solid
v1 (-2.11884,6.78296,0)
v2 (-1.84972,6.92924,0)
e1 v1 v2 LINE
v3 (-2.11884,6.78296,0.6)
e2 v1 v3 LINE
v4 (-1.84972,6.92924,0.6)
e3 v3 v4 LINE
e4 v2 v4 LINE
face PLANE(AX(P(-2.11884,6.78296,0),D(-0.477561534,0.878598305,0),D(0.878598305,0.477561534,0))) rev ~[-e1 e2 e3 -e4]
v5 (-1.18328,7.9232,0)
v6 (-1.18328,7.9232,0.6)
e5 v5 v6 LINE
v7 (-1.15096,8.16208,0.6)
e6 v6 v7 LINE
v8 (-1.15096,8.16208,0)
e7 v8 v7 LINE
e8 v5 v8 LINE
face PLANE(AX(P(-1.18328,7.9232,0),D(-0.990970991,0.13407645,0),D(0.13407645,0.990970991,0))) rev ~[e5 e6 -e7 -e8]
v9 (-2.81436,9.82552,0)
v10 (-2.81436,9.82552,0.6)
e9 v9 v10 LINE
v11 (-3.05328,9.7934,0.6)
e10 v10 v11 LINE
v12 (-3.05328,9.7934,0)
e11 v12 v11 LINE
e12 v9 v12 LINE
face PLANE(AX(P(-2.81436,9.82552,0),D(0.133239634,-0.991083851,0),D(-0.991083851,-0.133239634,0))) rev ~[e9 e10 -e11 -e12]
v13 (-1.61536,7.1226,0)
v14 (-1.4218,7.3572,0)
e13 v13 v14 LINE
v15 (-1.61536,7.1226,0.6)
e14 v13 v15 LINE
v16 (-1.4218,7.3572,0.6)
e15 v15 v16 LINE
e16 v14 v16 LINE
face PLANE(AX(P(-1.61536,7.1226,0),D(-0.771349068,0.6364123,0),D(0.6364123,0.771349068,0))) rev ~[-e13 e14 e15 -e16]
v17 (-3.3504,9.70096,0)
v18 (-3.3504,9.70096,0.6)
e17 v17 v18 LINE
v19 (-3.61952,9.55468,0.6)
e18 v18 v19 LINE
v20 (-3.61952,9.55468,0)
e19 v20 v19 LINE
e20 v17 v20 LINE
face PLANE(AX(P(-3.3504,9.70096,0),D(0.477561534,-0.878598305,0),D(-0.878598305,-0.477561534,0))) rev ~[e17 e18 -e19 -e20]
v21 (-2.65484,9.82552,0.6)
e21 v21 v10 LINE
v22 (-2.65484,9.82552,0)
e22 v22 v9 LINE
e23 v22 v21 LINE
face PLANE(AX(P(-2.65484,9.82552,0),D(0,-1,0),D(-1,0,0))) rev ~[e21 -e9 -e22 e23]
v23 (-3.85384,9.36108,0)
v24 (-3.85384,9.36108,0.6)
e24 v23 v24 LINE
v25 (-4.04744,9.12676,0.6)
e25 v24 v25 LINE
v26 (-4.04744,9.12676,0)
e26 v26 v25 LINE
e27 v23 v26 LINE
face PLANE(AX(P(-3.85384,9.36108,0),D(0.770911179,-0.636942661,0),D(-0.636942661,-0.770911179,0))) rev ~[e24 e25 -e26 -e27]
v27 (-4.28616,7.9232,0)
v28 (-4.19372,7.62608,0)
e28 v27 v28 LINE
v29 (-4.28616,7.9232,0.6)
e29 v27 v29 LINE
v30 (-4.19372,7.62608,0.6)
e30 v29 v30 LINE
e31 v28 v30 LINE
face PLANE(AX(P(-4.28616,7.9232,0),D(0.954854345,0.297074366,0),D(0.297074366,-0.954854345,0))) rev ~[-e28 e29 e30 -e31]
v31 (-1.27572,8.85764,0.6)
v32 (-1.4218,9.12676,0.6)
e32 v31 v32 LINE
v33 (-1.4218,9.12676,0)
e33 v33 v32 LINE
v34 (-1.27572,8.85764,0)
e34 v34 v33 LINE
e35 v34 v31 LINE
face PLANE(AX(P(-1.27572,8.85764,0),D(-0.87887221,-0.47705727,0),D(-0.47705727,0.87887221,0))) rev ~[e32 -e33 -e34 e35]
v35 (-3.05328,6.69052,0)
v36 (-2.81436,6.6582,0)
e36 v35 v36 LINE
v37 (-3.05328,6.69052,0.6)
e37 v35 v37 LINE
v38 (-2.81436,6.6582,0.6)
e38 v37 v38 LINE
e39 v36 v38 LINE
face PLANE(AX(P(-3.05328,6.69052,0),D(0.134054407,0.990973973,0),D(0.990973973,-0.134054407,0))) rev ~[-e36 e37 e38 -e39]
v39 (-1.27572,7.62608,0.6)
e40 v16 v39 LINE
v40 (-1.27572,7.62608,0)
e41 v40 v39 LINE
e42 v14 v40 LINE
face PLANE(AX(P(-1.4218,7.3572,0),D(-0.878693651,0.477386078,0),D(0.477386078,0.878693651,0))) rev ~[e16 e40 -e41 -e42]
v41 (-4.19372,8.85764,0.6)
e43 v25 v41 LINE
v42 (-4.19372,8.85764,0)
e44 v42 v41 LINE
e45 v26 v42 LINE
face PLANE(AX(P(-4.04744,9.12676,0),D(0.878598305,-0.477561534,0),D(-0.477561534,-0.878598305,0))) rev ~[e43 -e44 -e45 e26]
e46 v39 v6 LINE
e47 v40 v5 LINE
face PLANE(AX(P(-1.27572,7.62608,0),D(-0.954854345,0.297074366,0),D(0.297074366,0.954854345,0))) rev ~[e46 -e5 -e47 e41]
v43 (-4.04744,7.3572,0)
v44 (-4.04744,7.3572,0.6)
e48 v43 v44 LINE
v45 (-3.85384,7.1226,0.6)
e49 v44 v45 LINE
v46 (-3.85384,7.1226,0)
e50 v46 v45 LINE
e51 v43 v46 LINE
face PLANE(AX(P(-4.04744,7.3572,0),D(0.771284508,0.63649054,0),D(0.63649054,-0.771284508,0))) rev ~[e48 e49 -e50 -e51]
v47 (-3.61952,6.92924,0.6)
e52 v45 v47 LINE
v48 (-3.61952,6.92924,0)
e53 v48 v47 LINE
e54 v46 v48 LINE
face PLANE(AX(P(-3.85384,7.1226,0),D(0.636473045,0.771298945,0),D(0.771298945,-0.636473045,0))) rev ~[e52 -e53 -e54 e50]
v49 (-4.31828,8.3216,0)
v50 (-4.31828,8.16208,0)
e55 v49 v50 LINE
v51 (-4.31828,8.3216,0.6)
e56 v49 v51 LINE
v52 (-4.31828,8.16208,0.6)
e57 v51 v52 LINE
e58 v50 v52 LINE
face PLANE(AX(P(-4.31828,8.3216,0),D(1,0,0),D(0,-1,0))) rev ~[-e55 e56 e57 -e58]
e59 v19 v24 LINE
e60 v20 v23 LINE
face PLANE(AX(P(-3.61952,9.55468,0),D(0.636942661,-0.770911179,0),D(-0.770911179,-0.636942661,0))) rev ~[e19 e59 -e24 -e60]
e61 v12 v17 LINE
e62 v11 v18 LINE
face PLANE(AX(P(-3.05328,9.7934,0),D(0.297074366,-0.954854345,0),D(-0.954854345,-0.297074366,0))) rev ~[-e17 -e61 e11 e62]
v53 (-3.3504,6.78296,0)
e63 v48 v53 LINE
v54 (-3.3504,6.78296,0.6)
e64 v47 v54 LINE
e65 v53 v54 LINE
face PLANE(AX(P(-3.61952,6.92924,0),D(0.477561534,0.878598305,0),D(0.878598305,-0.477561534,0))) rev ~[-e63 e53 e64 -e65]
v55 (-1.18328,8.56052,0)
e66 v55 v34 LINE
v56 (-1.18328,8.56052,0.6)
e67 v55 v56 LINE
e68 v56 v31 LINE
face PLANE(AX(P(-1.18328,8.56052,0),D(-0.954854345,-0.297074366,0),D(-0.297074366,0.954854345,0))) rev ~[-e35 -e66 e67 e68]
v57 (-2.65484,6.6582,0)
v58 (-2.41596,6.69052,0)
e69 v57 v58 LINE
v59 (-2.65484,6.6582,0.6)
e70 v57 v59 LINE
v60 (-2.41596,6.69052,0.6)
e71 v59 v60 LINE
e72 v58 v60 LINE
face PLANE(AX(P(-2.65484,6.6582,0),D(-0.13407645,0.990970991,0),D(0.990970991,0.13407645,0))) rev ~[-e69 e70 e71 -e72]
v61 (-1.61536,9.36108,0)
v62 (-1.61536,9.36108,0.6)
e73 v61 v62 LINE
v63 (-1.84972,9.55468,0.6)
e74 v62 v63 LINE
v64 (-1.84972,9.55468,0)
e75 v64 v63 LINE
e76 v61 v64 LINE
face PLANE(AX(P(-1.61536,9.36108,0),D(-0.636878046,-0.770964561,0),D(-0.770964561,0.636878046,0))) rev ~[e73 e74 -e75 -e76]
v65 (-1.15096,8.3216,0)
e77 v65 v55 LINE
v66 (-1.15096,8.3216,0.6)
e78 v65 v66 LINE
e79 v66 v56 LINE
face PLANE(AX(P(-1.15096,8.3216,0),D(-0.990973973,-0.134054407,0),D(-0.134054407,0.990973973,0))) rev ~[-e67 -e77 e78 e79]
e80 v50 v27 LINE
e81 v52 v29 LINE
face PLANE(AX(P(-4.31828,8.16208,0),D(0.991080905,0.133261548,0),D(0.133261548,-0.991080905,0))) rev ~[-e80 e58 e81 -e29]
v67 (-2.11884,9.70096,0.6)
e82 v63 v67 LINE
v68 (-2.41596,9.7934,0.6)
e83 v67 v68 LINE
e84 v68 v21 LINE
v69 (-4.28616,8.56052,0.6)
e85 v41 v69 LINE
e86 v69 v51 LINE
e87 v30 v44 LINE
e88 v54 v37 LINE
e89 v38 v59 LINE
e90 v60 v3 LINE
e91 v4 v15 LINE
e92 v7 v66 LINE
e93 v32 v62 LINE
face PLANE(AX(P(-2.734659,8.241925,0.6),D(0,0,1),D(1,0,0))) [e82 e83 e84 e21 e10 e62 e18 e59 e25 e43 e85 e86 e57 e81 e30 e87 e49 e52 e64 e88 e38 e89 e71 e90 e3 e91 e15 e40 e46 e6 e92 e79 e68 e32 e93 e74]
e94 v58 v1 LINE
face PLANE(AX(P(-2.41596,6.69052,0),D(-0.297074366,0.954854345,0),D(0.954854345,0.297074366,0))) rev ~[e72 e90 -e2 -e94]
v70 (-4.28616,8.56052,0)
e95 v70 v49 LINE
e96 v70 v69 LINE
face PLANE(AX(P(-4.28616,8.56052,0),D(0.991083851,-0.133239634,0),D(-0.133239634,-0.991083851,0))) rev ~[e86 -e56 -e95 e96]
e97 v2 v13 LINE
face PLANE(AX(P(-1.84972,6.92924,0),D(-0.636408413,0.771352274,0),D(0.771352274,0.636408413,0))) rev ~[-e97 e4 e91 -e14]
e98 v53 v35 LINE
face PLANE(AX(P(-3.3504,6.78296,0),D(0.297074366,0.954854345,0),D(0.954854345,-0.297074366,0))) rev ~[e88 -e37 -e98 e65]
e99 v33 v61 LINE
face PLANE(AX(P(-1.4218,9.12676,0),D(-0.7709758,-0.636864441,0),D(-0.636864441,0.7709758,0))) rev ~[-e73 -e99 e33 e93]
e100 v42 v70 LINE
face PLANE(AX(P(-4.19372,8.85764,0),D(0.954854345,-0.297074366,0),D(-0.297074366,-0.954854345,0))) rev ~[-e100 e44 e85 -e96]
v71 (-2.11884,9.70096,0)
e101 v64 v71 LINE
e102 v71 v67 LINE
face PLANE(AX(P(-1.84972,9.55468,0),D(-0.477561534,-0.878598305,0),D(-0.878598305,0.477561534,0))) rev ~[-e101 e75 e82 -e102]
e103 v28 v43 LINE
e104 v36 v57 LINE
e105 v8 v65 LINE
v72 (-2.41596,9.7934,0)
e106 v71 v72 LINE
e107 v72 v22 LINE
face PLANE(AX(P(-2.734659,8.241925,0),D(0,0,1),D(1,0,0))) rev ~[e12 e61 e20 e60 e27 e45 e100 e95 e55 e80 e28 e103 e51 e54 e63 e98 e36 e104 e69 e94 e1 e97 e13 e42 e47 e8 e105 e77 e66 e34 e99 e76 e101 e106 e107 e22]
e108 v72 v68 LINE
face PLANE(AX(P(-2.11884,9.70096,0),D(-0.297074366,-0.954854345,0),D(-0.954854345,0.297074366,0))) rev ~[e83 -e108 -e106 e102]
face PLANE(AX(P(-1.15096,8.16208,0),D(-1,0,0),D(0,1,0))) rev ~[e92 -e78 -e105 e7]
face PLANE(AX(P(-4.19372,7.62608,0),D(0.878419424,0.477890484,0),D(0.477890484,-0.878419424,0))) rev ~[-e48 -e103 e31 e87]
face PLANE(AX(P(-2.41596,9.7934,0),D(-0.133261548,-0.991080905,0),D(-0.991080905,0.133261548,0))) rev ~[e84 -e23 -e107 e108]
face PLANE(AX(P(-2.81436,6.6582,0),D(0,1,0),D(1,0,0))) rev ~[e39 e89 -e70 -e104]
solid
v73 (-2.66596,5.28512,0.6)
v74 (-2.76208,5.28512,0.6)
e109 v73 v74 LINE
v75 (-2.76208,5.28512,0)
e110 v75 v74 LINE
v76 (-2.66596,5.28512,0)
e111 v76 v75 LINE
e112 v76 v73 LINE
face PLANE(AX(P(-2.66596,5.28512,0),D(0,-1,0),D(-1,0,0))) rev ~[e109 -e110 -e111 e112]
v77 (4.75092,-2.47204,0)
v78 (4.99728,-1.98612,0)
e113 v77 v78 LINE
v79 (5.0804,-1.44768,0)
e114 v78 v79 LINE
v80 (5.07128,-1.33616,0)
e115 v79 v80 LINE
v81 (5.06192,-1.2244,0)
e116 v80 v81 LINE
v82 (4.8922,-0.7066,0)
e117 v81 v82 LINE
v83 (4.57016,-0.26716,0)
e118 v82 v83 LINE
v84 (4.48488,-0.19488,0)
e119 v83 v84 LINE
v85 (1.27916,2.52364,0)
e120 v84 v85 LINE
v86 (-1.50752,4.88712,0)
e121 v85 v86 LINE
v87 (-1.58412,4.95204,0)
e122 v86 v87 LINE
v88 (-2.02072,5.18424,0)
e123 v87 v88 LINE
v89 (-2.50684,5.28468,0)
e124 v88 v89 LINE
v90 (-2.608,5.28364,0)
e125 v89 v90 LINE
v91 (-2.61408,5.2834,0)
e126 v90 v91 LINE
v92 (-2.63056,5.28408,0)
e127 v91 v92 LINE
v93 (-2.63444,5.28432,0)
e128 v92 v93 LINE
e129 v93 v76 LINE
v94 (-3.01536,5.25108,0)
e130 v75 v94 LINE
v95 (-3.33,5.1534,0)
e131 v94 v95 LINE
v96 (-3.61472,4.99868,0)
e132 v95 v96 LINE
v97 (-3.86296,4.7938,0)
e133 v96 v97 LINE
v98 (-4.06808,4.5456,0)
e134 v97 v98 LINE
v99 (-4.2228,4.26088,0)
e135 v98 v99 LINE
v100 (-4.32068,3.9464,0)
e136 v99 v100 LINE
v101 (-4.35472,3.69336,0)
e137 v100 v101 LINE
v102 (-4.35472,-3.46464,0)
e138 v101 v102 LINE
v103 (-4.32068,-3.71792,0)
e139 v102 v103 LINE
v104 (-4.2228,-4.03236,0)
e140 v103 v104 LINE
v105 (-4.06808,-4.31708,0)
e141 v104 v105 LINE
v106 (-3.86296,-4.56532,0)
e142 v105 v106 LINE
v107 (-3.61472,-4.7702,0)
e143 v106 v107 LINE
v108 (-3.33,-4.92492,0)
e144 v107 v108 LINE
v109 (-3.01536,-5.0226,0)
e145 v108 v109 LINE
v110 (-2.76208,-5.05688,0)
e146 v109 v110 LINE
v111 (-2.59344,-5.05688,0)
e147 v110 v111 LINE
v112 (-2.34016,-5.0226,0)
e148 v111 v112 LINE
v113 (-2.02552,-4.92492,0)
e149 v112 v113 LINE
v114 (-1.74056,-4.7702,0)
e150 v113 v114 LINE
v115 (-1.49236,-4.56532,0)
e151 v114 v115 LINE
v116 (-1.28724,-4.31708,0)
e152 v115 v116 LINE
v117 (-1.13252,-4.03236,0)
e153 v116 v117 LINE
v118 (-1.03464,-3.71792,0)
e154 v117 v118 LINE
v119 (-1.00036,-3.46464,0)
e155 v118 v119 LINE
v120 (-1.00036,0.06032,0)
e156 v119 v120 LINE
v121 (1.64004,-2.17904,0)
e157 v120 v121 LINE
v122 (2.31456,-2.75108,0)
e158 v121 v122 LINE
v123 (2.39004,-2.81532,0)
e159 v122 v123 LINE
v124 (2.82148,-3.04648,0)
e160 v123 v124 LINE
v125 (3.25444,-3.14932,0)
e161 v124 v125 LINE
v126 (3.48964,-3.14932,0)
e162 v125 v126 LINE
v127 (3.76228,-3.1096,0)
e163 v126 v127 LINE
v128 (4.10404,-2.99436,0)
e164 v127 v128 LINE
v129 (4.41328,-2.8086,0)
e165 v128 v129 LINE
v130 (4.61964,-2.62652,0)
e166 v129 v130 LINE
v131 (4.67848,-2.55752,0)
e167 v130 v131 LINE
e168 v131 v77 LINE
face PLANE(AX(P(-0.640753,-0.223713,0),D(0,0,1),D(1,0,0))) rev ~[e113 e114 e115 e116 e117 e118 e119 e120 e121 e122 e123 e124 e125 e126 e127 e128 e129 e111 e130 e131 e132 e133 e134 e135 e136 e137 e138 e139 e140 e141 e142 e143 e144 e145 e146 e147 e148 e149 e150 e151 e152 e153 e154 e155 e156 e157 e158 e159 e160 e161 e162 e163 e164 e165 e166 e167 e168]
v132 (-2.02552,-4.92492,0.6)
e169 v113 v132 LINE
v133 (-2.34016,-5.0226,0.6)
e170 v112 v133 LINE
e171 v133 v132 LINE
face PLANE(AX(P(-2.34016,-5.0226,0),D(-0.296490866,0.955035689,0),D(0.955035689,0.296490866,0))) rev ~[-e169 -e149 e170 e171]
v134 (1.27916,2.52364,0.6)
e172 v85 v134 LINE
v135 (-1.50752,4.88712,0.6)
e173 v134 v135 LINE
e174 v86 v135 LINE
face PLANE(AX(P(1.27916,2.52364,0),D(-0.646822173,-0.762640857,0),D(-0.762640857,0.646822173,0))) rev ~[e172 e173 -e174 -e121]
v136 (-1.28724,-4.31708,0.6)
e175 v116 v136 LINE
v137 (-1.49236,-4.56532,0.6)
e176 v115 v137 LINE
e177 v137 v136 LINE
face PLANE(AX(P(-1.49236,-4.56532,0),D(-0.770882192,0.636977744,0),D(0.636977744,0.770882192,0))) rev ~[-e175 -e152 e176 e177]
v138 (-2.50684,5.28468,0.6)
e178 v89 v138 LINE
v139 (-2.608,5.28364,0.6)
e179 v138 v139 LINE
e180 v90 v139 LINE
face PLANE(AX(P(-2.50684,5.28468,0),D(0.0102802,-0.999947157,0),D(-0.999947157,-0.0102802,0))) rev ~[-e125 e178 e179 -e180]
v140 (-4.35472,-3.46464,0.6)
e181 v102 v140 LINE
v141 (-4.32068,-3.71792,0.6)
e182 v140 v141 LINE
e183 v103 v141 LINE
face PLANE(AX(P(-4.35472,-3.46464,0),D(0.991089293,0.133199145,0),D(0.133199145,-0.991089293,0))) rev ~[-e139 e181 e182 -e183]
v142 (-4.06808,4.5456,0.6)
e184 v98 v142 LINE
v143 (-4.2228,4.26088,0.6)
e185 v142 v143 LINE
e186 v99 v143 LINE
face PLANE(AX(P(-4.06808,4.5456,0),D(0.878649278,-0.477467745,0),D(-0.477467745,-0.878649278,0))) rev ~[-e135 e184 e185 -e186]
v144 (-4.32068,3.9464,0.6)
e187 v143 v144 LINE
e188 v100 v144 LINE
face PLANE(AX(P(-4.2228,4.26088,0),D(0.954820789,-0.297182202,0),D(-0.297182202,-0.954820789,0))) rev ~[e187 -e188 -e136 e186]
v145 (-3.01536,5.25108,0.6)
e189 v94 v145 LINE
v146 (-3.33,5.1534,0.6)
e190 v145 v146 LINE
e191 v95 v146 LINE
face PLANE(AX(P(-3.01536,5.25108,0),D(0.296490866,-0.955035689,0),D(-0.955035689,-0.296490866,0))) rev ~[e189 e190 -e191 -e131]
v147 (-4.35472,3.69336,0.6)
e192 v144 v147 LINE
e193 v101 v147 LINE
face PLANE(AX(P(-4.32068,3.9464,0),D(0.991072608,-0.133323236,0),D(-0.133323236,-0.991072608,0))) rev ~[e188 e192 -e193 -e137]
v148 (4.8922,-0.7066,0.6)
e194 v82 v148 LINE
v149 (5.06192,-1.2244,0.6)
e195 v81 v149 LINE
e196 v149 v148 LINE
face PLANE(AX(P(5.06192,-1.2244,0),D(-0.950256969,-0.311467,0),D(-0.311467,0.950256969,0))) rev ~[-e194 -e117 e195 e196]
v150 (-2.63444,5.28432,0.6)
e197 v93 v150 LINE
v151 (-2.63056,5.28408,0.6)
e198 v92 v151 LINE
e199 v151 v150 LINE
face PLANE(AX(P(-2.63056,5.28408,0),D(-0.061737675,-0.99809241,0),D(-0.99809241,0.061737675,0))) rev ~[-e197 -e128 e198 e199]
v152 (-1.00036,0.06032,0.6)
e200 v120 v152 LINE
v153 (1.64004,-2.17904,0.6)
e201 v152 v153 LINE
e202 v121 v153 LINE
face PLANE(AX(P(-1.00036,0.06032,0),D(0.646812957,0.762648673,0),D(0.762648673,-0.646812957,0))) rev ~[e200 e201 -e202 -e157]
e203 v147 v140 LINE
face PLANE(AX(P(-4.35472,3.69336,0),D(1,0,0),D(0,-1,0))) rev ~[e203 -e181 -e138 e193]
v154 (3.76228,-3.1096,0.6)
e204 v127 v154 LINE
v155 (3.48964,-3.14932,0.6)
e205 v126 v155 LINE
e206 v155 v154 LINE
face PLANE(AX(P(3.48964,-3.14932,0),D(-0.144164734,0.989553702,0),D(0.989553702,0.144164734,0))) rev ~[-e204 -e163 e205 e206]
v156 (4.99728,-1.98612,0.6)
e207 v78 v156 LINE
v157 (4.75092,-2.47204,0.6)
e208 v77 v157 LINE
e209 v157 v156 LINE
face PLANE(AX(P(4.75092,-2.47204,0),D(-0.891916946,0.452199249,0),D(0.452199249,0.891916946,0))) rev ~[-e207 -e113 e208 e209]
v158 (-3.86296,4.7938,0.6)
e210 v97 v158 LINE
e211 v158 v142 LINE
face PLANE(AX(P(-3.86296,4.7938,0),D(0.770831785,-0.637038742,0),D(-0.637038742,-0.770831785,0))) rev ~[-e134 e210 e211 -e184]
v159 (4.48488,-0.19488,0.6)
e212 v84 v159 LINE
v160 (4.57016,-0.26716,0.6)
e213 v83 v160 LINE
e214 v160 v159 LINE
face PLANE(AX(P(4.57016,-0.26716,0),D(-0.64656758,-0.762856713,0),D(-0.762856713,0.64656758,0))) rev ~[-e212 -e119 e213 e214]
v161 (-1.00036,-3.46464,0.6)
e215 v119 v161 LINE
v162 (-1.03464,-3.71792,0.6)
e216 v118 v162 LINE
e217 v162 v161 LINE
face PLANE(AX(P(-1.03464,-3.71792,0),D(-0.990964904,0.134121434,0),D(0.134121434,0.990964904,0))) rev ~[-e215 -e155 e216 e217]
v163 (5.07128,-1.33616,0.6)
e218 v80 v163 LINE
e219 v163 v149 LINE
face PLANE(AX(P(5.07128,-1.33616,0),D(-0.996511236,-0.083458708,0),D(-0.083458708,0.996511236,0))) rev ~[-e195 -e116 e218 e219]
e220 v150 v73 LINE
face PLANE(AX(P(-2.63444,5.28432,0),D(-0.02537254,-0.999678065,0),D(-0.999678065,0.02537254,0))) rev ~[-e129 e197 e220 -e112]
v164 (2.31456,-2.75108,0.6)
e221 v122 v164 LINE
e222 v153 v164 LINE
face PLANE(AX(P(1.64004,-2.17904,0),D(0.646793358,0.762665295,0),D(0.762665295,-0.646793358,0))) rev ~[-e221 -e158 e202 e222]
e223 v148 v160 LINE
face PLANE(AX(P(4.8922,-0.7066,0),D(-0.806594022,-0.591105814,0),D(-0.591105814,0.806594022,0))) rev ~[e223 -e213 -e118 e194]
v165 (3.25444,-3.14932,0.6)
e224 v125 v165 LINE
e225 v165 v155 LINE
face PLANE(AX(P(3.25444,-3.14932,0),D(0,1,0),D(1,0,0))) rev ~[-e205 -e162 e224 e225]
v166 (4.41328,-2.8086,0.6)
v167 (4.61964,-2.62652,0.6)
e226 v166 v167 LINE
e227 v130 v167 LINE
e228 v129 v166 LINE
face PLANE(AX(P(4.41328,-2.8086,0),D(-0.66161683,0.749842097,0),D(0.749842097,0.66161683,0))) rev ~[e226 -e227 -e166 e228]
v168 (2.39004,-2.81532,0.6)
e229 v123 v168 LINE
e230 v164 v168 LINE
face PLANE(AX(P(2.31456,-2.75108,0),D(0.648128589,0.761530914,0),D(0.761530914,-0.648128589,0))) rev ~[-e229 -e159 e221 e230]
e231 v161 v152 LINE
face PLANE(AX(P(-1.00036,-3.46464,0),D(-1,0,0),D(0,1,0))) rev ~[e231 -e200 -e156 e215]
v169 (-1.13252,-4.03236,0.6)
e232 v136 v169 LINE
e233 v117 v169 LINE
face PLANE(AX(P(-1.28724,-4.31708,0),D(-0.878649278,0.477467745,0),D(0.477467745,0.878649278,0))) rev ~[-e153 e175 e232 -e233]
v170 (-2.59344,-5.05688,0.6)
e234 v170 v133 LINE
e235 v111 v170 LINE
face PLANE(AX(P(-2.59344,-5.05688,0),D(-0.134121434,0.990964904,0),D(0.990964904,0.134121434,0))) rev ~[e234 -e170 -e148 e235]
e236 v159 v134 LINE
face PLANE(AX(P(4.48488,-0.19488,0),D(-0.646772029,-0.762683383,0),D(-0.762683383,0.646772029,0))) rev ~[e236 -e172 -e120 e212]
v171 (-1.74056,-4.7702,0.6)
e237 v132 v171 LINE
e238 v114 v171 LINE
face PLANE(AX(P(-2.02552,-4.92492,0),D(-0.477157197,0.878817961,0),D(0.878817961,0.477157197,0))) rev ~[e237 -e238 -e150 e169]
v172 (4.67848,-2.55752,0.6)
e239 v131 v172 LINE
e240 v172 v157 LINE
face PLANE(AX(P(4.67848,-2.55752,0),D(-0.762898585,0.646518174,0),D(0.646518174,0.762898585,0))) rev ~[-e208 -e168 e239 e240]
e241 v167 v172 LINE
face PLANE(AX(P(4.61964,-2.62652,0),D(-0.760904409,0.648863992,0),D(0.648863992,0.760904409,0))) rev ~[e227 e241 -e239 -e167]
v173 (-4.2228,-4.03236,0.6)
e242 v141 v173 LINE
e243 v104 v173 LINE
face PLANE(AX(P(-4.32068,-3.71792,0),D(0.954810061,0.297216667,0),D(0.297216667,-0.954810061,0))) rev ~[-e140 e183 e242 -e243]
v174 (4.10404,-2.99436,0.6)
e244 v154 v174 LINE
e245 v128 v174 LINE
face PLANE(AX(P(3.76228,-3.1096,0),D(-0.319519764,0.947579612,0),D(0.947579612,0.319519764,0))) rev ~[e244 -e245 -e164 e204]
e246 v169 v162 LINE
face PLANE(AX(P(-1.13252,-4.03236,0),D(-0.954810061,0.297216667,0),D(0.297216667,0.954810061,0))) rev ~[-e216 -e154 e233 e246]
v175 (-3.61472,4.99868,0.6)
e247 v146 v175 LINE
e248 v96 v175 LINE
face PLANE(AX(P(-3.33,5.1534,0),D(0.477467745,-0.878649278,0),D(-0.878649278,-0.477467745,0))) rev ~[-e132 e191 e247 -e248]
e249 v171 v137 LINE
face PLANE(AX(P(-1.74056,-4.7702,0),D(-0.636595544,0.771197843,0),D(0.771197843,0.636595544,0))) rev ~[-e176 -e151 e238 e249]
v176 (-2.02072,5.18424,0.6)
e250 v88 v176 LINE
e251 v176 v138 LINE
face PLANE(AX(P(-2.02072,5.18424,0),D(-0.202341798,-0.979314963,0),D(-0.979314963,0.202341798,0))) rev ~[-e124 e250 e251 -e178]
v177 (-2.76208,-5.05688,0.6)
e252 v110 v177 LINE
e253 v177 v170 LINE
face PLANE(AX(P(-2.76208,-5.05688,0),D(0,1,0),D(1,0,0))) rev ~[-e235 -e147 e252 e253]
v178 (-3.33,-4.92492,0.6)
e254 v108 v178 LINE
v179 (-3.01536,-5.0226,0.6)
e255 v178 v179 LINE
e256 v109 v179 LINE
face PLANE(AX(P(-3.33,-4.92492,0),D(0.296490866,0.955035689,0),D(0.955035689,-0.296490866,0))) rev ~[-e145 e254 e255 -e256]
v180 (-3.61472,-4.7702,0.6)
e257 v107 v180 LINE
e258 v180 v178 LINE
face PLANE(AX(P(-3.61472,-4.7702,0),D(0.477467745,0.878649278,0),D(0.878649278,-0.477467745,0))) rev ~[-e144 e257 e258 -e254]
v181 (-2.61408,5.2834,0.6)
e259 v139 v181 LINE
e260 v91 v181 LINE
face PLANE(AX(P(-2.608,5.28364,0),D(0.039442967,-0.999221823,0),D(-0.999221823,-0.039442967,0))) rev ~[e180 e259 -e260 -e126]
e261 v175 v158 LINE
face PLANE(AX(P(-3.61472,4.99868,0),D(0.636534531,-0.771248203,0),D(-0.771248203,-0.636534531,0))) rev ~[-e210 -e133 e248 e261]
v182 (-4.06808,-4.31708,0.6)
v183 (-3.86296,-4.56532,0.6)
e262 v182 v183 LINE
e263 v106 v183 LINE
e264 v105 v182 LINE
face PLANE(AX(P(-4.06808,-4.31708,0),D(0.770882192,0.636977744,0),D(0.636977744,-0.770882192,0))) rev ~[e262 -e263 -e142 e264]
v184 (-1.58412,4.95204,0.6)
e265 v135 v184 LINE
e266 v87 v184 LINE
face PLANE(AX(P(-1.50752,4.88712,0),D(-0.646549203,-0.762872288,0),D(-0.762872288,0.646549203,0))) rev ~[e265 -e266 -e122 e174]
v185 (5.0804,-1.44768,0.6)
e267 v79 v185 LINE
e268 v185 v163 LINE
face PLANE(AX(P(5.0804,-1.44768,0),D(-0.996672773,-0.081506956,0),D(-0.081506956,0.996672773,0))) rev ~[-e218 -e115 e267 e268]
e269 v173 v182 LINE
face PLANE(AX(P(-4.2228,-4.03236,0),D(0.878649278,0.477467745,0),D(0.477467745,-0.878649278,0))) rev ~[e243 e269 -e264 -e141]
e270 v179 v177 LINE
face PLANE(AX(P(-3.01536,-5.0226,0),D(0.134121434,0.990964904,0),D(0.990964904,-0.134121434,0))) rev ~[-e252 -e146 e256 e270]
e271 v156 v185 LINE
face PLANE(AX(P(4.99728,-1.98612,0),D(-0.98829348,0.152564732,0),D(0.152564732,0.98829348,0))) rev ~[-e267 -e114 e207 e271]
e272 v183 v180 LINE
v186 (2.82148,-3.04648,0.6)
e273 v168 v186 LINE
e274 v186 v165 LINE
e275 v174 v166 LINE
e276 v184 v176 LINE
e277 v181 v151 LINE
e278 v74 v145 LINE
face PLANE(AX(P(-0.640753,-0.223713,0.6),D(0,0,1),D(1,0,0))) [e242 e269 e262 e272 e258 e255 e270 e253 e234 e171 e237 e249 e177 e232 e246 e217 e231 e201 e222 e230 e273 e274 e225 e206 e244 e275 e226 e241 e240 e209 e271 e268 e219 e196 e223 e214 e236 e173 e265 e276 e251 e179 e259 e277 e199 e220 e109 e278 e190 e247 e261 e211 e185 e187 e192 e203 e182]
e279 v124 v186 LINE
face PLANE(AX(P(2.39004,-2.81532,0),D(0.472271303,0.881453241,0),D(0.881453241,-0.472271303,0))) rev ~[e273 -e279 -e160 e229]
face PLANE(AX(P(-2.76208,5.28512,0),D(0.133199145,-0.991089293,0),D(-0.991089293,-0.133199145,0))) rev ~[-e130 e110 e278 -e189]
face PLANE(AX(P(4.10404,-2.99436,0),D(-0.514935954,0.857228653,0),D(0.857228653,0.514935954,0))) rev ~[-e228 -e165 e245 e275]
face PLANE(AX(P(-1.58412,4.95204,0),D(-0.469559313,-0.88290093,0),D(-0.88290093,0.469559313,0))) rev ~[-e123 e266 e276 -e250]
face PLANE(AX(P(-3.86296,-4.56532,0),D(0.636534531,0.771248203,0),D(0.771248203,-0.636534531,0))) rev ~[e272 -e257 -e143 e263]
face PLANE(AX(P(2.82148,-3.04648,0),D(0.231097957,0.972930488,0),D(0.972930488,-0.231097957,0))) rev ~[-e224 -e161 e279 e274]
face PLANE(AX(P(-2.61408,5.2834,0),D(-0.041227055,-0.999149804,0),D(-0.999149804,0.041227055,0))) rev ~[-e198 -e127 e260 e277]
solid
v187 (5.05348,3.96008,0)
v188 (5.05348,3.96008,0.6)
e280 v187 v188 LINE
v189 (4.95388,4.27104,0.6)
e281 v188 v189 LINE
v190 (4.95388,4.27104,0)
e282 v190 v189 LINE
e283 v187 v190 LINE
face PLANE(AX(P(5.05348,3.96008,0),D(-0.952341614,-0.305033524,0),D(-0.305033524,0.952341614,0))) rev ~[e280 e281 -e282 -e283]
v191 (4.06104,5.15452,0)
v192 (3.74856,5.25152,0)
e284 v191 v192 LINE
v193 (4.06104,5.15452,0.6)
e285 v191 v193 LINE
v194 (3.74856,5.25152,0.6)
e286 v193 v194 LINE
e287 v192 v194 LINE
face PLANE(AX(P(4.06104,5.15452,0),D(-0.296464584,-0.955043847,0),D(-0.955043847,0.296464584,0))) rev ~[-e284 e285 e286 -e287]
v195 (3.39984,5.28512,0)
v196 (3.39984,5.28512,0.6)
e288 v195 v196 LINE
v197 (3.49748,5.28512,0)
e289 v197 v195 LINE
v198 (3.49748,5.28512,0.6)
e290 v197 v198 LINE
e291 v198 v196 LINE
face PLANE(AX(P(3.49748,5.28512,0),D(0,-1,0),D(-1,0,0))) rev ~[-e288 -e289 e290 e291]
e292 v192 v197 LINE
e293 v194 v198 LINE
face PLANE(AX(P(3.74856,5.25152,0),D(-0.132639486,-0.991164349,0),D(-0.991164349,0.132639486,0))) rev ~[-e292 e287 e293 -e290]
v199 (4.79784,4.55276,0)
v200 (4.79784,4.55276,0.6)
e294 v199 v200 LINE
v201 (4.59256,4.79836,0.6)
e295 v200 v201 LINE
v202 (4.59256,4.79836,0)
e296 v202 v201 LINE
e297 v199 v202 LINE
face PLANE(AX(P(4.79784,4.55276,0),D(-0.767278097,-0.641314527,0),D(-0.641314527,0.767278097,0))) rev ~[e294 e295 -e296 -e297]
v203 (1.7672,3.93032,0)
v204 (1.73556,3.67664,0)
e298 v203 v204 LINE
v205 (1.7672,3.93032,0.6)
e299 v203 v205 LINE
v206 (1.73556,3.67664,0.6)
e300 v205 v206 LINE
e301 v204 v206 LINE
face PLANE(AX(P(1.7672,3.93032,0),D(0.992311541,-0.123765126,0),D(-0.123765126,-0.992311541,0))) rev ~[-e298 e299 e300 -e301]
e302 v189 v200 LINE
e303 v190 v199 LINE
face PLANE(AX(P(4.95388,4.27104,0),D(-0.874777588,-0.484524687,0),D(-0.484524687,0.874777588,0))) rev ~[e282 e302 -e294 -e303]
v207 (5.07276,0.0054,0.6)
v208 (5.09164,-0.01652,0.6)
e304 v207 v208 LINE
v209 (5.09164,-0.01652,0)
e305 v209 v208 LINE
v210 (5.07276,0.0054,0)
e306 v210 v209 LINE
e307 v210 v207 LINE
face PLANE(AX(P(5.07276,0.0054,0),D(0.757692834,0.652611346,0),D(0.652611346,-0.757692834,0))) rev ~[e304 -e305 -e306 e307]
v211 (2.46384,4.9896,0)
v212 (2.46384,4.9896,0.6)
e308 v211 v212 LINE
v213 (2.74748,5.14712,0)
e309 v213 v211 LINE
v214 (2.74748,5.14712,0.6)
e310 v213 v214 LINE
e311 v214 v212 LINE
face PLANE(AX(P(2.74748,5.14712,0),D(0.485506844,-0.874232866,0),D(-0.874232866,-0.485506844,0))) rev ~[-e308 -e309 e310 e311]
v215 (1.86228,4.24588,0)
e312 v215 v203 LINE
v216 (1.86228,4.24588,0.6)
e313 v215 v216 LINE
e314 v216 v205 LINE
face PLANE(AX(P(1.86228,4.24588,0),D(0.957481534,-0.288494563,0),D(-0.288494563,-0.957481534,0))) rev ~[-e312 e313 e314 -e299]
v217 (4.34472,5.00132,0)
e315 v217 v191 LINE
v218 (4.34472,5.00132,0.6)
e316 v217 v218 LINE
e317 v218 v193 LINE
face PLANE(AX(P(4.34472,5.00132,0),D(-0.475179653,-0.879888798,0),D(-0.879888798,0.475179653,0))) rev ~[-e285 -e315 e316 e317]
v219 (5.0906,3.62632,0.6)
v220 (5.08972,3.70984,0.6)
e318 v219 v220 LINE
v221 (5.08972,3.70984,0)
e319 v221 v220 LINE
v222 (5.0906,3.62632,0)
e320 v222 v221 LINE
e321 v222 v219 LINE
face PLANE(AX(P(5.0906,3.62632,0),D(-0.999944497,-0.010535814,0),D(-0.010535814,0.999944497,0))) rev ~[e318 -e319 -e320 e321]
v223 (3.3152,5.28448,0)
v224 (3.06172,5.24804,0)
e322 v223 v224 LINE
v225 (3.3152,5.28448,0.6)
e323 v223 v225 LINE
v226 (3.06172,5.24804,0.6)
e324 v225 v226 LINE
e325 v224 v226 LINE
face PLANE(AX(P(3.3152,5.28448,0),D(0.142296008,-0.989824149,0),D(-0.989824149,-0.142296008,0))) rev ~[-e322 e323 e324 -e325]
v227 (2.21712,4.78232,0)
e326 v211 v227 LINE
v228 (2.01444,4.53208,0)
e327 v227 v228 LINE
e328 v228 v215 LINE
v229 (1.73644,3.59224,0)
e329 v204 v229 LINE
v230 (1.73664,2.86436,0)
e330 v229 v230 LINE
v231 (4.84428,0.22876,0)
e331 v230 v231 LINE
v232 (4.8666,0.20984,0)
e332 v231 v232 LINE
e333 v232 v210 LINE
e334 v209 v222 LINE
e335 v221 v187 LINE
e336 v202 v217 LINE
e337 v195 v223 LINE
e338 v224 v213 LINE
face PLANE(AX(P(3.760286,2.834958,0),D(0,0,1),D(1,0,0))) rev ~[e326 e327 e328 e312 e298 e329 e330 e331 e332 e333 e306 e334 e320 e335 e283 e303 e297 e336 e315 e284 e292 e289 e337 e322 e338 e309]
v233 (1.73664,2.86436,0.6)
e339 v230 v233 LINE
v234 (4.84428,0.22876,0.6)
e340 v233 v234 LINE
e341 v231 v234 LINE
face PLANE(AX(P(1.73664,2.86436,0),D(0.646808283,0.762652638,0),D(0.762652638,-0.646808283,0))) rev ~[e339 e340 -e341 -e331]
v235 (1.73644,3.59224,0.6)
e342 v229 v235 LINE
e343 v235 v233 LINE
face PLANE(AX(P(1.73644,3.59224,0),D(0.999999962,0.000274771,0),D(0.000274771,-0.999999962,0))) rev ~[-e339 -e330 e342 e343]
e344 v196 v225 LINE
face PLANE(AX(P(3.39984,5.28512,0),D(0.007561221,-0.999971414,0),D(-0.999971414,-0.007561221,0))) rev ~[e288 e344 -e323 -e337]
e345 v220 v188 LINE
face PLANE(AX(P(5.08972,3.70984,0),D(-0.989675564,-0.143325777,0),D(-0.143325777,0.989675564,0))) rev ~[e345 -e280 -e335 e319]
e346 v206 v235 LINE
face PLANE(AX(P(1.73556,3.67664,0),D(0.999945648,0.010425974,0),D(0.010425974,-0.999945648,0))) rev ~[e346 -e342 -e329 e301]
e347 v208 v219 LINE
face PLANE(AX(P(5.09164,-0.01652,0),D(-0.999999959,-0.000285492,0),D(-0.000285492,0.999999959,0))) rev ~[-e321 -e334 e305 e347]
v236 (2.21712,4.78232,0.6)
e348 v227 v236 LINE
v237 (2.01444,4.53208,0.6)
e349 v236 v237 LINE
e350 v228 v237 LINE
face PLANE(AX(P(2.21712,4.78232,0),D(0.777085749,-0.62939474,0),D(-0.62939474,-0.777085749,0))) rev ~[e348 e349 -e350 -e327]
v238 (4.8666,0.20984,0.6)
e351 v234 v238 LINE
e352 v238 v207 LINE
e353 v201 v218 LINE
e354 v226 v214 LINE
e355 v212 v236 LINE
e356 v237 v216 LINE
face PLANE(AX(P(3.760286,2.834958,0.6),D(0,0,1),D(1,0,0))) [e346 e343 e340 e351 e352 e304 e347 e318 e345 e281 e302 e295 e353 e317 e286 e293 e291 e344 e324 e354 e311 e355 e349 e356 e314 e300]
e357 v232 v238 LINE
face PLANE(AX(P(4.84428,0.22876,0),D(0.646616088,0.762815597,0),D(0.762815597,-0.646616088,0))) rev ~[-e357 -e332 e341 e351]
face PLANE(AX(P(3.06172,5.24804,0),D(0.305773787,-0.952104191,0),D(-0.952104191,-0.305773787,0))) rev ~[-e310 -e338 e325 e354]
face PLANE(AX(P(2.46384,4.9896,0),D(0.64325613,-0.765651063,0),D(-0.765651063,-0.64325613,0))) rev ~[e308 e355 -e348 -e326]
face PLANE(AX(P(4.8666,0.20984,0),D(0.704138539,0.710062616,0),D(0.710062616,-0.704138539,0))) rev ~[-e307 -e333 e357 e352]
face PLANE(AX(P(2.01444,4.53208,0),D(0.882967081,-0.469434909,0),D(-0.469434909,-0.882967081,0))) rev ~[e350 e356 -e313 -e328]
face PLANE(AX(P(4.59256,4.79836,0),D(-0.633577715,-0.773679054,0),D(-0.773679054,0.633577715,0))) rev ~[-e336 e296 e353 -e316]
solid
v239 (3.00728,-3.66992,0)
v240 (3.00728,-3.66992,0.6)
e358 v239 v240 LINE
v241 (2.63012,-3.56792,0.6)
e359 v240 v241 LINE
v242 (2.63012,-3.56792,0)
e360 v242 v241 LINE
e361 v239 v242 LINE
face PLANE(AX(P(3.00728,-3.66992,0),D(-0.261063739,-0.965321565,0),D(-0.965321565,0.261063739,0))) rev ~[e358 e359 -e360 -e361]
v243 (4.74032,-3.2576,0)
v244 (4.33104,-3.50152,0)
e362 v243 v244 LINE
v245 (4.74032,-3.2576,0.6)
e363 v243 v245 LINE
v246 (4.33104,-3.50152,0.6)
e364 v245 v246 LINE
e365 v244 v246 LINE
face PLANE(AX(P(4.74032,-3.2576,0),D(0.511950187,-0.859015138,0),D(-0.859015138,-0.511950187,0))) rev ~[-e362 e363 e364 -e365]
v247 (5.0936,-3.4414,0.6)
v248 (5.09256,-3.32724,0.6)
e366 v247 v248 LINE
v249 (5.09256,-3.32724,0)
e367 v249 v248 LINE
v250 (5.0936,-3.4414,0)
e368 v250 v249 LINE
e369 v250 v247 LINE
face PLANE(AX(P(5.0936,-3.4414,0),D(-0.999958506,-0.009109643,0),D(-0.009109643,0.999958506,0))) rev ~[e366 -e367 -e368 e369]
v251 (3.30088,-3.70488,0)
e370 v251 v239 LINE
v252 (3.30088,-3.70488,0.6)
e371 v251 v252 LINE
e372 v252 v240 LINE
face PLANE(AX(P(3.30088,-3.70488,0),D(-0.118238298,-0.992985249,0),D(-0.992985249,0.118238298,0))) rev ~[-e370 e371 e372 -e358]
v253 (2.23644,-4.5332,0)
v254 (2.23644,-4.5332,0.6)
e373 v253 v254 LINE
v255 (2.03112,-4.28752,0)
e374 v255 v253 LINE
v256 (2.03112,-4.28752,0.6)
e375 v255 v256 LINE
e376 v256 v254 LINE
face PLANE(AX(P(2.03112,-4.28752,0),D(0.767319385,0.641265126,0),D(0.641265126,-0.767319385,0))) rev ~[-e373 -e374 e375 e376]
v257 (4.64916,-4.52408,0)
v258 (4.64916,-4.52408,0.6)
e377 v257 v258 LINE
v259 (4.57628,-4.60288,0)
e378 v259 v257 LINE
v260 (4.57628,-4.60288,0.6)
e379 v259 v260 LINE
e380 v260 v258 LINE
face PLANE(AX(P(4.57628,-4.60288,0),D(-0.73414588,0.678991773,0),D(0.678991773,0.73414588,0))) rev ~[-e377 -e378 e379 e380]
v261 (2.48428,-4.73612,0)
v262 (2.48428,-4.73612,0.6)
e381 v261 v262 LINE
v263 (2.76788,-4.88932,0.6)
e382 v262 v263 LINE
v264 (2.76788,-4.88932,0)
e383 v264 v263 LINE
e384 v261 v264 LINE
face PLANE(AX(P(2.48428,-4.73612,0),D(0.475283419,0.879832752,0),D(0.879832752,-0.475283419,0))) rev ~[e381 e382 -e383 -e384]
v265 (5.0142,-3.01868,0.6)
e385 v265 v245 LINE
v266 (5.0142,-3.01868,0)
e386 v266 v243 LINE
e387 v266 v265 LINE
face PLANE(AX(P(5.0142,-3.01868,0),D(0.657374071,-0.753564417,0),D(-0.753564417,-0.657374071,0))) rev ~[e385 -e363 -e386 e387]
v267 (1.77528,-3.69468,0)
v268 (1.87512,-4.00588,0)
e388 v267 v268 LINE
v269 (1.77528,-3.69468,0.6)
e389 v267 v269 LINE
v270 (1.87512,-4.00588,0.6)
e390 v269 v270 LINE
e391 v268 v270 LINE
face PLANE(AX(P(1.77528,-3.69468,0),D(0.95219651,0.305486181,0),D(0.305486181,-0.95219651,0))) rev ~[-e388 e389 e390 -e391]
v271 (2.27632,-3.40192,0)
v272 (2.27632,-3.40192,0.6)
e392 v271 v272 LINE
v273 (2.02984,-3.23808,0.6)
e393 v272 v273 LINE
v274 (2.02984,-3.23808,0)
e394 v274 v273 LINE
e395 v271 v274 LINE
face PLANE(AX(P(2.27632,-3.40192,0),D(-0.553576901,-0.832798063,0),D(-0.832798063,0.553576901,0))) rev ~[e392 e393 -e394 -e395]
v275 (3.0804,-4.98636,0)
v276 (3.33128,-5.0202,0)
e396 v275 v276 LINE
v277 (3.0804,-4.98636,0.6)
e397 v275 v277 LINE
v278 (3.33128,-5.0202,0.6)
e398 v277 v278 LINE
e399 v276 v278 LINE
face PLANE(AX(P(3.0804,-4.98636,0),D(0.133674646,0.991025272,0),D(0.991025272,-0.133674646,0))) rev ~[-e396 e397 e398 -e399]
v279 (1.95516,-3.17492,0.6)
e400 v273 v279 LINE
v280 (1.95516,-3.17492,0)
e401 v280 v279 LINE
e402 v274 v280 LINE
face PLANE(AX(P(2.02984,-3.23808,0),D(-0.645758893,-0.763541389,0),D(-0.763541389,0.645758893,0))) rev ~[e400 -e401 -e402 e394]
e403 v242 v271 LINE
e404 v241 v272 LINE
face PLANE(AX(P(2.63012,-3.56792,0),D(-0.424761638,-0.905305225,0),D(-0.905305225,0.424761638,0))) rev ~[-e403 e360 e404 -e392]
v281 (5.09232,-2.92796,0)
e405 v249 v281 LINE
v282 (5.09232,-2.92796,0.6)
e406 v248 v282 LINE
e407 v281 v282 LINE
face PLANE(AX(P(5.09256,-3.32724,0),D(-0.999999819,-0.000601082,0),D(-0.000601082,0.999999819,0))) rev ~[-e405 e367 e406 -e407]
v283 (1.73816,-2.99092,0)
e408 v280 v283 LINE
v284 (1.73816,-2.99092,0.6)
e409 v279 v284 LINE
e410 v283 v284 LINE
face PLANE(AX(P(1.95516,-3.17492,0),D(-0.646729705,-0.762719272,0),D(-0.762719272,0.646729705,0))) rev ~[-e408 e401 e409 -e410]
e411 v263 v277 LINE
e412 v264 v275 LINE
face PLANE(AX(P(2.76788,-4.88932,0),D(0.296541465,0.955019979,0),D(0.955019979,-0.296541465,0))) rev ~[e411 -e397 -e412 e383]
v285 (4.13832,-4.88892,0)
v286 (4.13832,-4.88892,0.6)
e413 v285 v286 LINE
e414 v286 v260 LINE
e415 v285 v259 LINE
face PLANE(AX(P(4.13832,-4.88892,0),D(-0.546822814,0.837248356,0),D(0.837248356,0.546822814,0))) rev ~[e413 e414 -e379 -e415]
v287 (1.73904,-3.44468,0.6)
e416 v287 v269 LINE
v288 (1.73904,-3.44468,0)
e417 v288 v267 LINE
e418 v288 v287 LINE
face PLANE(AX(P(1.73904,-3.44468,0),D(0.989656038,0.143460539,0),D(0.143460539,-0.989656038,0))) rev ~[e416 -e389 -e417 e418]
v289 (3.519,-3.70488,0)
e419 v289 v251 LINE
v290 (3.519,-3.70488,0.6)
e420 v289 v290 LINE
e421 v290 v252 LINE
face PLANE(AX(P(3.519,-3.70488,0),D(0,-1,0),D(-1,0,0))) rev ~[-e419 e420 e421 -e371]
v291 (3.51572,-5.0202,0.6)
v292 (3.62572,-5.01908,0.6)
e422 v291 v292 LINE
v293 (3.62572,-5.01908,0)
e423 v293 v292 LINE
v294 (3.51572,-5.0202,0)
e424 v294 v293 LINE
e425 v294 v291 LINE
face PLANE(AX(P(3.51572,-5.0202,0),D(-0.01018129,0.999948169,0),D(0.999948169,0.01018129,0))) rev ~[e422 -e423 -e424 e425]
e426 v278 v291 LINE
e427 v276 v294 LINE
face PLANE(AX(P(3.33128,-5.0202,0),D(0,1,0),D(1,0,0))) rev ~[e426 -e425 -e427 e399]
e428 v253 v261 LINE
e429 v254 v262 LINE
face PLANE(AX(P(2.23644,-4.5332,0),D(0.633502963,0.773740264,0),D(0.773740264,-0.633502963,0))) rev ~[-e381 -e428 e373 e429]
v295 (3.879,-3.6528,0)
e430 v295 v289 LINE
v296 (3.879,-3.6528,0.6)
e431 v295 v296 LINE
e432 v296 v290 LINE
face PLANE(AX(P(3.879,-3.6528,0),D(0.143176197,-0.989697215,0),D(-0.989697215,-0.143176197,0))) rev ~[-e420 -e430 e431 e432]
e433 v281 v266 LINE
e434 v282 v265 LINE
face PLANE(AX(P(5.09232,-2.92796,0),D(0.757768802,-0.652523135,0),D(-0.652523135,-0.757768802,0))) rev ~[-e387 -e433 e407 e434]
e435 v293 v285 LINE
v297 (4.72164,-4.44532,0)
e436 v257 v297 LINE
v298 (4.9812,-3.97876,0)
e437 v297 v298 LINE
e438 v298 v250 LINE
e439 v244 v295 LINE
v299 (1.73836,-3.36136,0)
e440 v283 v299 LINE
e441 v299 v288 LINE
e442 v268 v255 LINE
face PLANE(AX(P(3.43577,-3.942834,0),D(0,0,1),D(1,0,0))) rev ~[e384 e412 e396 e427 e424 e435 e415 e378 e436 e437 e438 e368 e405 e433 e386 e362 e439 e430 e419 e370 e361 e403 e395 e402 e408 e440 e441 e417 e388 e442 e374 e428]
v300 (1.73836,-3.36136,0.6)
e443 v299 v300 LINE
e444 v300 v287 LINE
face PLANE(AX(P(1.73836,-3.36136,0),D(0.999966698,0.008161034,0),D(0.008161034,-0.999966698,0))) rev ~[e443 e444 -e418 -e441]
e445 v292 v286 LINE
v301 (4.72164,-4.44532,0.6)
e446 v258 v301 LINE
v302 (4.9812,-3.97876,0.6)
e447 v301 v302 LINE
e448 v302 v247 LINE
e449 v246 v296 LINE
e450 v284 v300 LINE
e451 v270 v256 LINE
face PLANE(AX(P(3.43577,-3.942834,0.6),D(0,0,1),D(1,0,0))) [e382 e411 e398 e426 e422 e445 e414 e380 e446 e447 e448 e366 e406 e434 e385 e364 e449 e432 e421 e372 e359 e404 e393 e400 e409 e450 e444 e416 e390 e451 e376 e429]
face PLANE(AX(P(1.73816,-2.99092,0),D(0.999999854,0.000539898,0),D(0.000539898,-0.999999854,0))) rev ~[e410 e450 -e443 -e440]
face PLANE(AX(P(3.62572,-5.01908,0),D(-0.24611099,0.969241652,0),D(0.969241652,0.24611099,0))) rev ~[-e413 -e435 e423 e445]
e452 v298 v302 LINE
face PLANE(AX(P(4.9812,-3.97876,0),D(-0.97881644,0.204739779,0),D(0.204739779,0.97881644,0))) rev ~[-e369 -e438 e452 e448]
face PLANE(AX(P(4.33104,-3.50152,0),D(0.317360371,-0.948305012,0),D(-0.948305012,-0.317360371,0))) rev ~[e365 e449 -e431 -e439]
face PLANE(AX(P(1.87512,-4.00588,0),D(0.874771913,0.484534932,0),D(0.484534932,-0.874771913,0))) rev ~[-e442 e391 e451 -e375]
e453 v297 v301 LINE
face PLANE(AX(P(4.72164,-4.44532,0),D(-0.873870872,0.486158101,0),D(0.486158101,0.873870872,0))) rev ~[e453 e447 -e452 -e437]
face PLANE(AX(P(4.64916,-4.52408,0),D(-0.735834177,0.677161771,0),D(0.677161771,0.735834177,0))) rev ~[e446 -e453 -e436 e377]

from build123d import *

# Parameters (mm, degrees)
F1_DEPTH = 0.15
F2_SCALE = 4


# Not quite as in the source:
# - ends of sketch curves that miss each other by under 0.0002 mm in the source are joined


with BuildPart() as f1:
    # F0 (on Top) → F1 (new body)
    with BuildSketch(Plane.XY):
        Polygon((-0.66371, 2.45638), (-0.68363, 2.45638), (-0.70359, 2.45638), (-0.76332, 2.44835), (-0.8376, 2.42524), (-0.90488, 2.38867), (-0.96346, 2.34027), (-1.01186, 2.28169), (-1.04843, 2.21441), (-1.07154, 2.14013), (-1.07957, 2.0804), (-1.07957, 2.06044), (-1.07957, 2.04052), (-1.07154, 1.9808), (-1.04843, 1.90652), (-1.01186, 1.8393), (-0.96346, 1.78065), (-0.90488, 1.73231), (-0.8376, 1.69574), (-0.76332, 1.67263), (-0.70359, 1.66455), (-0.68363, 1.66455), (-0.66371, 1.66455), (-0.60399, 1.67263), (-0.52971, 1.69574), (-0.46243, 1.73231), (-0.40384, 1.78065), (-0.35545, 1.8393), (-0.31893, 1.90652), (-0.29582, 1.9808), (-0.28774, 2.04052), (-0.28774, 2.06044), (-0.28774, 2.0804), (-0.29582, 2.14013), (-0.31893, 2.21441), (-0.35545, 2.28169), (-0.40384, 2.34027), (-0.46243, 2.38867), (-0.52971, 2.42524), (-0.60399, 2.44835), align=None)
    extrude(amount=F1_DEPTH)


with BuildPart() as f1b:
    # F0 (on Top) → F1, piece 2 (new body)
    with BuildSketch(Plane.XY):
        Polygon((-0.25009, -0.8451), (-0.25009, 0.01508), (0.41001, -0.54476), (0.57864, -0.68777), (0.59751, -0.70383), (0.70537, -0.76162), (0.81361, -0.78733), (0.84973, -0.78733), (0.87241, -0.78733), (0.94057, -0.7774), (1.02601, -0.74859), (1.10332, -0.70215), (1.15491, -0.65663), (1.16962, -0.63938), (1.18773, -0.61801), (1.24932, -0.49653), (1.2701, -0.36192), (1.26782, -0.33404), (1.26548, -0.3061), (1.22305, -0.17665), (1.14254, -0.06679), (1.12122, -0.04872), (0.31979, 0.63091), (-0.37688, 1.22178), (-0.39603, 1.23801), (-0.50518, 1.29606), (-0.62671, 1.32117), (-0.652, 1.32091), (-0.65352, 1.32085), (-0.65764, 1.32102), (-0.65861, 1.32108), (-0.66649, 1.32128), (-0.6694, 1.32128), (-0.69052, 1.32128), (-0.75384, 1.31277), (-0.8325, 1.28835), (-0.90368, 1.24967), (-0.96574, 1.19845), (-1.01702, 1.1364), (-1.0557, 1.06522), (-1.08017, 0.9866), (-1.08868, 0.92334), (-1.08868, 0.90223), (-1.08868, -0.8451), (-1.08868, -0.86616), (-1.08017, -0.92948), (-1.0557, -1.00809), (-1.01702, -1.07927), (-0.96574, -1.14133), (-0.90368, -1.19255), (-0.8325, -1.23123), (-0.75384, -1.25565), (-0.69052, -1.26422), (-0.6694, -1.26422), (-0.64836, -1.26422), (-0.58504, -1.25565), (-0.50638, -1.23123), (-0.43514, -1.19255), (-0.37309, -1.14133), (-0.32181, -1.07927), (-0.28313, -1.00809), (-0.25866, -0.92948), (-0.25009, -0.86616), align=None)
    extrude(amount=F1_DEPTH)


with BuildPart() as f1c:
    # F0 (on Top) → F1, piece 3 (new body)
    with BuildSketch(Plane.XY):
        Polygon((0.85348, 1.32128), (0.84996, 1.32128), (0.8288, 1.32112), (0.76543, 1.31201), (0.68687, 1.28678), (0.61596, 1.2474), (0.55428, 1.19558), (0.50361, 1.13302), (0.46557, 1.06147), (0.4418, 0.98258), (0.43389, 0.91916), (0.43411, 0.89806), (0.43416, 0.71609), (1.21107, 0.05719), (1.21665, 0.05246), (1.26819, 0.00135), (1.27291, -0.00413), (1.27265, 0.90658), (1.27243, 0.92746), (1.26337, 0.99002), (1.23847, 1.06776), (1.19946, 1.13819), (1.14814, 1.19959), (1.08618, 1.25033), (1.01526, 1.28863), (0.93714, 1.31288), (0.87437, 1.32128), align=None)
    extrude(amount=F1_DEPTH)


with BuildPart() as f1d:
    # F0 (on Top) → F1, piece 4 (new body)
    with BuildSketch(Plane.XY):
        Polygon((1.14407, -1.15072), (1.16229, -1.13102), (1.18041, -1.11133), (1.2453, -0.99469), (1.2734, -0.86035), (1.27314, -0.83181), (1.27308, -0.73199), (1.25355, -0.75467), (1.18508, -0.8144), (1.08276, -0.87538), (0.96975, -0.9132), (0.87975, -0.92622), (0.84973, -0.92622), (0.82522, -0.92622), (0.75182, -0.91748), (0.65753, -0.89198), (0.56908, -0.85048), (0.50746, -0.80952), (0.48879, -0.79373), (0.43454, -0.74773), (0.43459, -0.84034), (0.43476, -0.86117), (0.44382, -0.92367), (0.46878, -1.00147), (0.50778, -1.07188), (0.55911, -1.1333), (0.62107, -1.18403), (0.69197, -1.22233), (0.7701, -1.24659), (0.83282, -1.25505), (0.85376, -1.25505), (0.85673, -1.25505), (0.8658, -1.25505), (0.87562, -1.25505), (0.87893, -1.25505), (0.90643, -1.25477), (1.03458, -1.22223), align=None)
    extrude(amount=F1_DEPTH)


with BuildPart() as f1_1:
    # F2: moved
    add(f1.part.scale(F2_SCALE))


with BuildPart() as f1b_1:
    # F2: moved
    add(f1b.part.scale(F2_SCALE))


with BuildPart() as f1c_1:
    # F2: moved
    add(f1c.part.scale(F2_SCALE))


with BuildPart() as f1d_1:
    # F2: moved
    add(f1d.part.scale(F2_SCALE))


solid = Compound([f1_1.part, f1b_1.part, f1c_1.part, f1d_1.part])
